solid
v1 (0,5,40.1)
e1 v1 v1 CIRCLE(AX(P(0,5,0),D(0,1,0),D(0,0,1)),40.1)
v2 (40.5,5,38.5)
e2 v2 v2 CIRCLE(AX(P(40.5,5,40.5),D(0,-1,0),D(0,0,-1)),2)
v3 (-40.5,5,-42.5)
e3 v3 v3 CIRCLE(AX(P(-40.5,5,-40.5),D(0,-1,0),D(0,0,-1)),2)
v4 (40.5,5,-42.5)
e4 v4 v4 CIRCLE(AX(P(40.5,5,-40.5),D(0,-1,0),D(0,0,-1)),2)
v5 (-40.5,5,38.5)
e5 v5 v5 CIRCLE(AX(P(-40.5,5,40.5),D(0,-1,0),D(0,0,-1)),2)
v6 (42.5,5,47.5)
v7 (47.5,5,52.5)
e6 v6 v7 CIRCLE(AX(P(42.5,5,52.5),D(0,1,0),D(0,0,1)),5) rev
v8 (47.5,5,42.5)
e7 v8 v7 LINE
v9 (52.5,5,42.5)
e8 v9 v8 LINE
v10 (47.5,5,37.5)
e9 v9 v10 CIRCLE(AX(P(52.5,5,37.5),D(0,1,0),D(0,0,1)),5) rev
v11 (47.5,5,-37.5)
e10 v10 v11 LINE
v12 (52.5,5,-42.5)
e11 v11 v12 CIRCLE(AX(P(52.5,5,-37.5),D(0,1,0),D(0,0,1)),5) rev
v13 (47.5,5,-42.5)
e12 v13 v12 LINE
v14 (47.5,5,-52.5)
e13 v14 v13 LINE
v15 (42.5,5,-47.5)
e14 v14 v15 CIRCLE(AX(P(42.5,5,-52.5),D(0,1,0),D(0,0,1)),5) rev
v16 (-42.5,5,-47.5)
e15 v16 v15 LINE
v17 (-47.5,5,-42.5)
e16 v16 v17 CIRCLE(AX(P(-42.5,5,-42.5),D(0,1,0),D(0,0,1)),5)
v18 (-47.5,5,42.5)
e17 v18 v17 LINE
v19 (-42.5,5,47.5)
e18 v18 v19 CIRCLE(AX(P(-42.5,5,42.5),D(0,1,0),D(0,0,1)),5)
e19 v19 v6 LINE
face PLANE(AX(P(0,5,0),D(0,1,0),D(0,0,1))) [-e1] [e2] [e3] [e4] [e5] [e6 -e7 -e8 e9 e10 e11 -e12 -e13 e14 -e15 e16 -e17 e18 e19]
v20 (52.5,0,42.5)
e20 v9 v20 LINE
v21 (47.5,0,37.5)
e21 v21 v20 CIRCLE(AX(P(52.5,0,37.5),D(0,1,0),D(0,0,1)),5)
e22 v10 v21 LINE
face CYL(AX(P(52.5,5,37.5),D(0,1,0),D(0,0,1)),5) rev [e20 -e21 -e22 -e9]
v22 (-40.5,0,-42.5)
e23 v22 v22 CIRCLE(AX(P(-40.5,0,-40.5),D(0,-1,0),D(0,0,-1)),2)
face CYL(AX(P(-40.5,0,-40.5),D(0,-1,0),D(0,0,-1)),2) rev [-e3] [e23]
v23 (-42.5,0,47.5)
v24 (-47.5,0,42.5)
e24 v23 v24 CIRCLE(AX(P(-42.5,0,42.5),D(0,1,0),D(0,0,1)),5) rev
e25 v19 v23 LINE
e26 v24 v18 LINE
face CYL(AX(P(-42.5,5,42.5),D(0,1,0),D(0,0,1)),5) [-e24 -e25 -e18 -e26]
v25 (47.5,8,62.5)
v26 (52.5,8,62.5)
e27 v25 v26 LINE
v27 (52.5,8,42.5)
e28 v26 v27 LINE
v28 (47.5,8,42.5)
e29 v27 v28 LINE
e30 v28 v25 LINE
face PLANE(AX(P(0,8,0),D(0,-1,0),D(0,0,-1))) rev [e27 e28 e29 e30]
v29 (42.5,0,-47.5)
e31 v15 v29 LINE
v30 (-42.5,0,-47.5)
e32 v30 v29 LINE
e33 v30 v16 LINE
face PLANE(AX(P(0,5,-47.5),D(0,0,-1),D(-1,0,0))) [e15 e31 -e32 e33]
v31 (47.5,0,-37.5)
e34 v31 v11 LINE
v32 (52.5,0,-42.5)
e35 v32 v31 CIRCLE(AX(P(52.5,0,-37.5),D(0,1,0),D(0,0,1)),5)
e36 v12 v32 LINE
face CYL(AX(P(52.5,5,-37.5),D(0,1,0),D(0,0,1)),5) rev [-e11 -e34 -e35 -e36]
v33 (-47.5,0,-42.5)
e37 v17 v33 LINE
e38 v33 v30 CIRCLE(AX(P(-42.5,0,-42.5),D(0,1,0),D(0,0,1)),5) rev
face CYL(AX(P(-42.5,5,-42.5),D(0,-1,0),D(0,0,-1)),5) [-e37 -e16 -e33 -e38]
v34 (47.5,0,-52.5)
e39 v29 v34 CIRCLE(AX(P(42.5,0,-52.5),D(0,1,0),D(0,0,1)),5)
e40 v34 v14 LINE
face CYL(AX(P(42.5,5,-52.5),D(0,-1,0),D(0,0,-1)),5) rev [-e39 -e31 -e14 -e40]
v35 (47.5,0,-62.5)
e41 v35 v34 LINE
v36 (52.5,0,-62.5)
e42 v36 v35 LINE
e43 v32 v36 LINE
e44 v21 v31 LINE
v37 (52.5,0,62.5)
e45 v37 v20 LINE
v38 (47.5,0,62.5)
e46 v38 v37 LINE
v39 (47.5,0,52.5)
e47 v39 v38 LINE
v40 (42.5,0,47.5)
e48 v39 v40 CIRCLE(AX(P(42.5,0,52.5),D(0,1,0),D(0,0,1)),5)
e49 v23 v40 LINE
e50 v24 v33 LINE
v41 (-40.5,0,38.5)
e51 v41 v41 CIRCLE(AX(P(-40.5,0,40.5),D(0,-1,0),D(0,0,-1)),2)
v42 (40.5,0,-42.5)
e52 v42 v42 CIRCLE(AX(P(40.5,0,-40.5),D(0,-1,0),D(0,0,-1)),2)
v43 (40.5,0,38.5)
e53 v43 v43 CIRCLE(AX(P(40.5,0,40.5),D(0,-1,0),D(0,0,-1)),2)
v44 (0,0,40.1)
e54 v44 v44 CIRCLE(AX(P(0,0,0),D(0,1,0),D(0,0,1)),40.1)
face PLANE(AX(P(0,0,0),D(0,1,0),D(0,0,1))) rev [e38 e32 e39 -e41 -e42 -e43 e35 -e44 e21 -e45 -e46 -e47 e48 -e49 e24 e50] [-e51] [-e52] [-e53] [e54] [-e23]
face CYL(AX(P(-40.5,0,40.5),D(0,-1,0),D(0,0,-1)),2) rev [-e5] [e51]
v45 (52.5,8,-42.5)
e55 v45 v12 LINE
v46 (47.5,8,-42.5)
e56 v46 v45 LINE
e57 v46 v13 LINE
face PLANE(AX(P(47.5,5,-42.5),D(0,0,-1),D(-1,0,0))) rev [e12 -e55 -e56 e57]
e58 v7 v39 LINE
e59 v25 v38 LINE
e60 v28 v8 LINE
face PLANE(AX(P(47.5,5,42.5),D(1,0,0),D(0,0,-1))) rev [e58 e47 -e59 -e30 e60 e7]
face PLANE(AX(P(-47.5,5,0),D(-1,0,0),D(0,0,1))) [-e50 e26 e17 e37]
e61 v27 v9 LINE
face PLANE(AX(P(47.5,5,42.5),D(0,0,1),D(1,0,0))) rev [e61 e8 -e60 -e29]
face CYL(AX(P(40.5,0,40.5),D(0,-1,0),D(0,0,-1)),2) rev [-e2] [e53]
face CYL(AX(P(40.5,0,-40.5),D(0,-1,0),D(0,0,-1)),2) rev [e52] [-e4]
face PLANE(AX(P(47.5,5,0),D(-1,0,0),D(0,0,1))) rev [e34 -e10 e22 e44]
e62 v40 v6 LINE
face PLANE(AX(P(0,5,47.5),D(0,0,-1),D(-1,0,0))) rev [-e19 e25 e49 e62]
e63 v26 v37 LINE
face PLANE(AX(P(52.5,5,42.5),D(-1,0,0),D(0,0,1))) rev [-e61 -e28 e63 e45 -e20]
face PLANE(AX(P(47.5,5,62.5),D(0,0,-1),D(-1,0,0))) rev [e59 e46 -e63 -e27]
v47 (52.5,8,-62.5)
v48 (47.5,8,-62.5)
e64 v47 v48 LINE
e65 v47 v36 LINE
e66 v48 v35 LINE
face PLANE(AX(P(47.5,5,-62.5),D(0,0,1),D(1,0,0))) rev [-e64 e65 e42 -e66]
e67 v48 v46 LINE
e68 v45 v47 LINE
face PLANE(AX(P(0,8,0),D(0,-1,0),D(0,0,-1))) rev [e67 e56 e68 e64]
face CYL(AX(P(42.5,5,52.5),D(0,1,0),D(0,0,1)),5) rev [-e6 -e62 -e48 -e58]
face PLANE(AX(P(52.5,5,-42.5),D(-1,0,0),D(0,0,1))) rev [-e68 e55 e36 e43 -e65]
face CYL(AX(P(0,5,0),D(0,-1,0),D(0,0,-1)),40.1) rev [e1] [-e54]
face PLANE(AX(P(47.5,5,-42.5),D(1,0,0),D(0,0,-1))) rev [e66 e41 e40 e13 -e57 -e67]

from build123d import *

# Parameters (mm, degrees)
SKETCH1_W             = 95
SKETCH1_H             = 95
SKETCH1_W_2           = 81
SKETCH1_H_2           = 81
SKETCH1_R             = 40.1
BOSS_EXTRUDE1_DEPTH   = 5
F_4_0MM_DOWEL_HOLE1_D = 4
SKETCH5_W             = 5
SKETCH5_H             = 20
BOSS_EXTRUDE2_DEPTH   = 5
SKETCH6_W             = 5
SKETCH6_H             = 20
BOSS_EXTRUDE3_DEPTH   = 3
FILLET1_R             = 5


with BuildPart() as part:
    # Sketch1 → Boss-Extrude1 (new body)
    # profile 1 of 2: a face of its own
    with BuildSketch(Plane(origin=(0, 0, 0), x_dir=(1, 0, 0), z_dir=(0, 1, 0))):
        Rectangle(SKETCH1_W, SKETCH1_H)
        Rectangle(SKETCH1_W_2, SKETCH1_H_2, mode=Mode.SUBTRACT)
    # profile 2 of 2: a face of its own
    with BuildSketch(Plane(origin=(0, 0, 0), x_dir=(1, 0, 0), z_dir=(0, 1, 0))):
        Rectangle(SKETCH1_W_2, SKETCH1_H_2)
        with Locations(Location((0, 0, 0), (0, 0, 270))):
            Circle(SKETCH1_R, mode=Mode.SUBTRACT)
    extrude(amount=BOSS_EXTRUDE1_DEPTH)

    # Ø4.0mm Dowel Hole1 (through all)
    with Locations(Plane(origin=(0, 0, 0), x_dir=(-1, 0, 0), z_dir=(0, -1, 0))):
        with Locations((40.5, -40.5), (-40.5, -40.5), (-40.5, 40.5), (40.5, 40.5)):
            Hole(F_4_0MM_DOWEL_HOLE1_D / 2)

    # Sketch5 → Boss-Extrude2 (add)
    with BuildSketch(Plane(origin=(0, 0, 0), x_dir=(1, 0, 0), z_dir=(0, 1, 0))):
        with Locations((50, -52.5)):
            Rectangle(SKETCH5_W, SKETCH5_H)
        with Locations((50, 52.5)):
            Rectangle(SKETCH5_W, SKETCH5_H)
    extrude(amount=BOSS_EXTRUDE2_DEPTH)

    # Sketch6 → Boss-Extrude3 (add)
    with BuildSketch(Plane(origin=(0, 5, 0), x_dir=(1, 0, 0), z_dir=(0, 1, 0))):
        with Locations((50, -52.5)):
            Rectangle(SKETCH6_W, SKETCH6_H)
        with Locations((50, 52.5)):
            Rectangle(SKETCH6_W, SKETCH6_H)
    extrude(amount=BOSS_EXTRUDE3_DEPTH)

    # Fillet1
    fillet1_edges = [part.edges().sort_by_distance(p)[0] for p in [
        (-47.5, 2.5, -47.5),
        (-47.5, 2.5, 47.5),
        (47.5, 2.5, 47.5),
        (47.5, 2.5, 42.5),
        (47.5, 2.5, -42.5),
        (47.5, 2.5, -47.5),
    ]]
    fillet(fillet1_edges, radius=FILLET1_R - 0.0001)  # a hair under: the kernel refuses the full size


solid = part.part
